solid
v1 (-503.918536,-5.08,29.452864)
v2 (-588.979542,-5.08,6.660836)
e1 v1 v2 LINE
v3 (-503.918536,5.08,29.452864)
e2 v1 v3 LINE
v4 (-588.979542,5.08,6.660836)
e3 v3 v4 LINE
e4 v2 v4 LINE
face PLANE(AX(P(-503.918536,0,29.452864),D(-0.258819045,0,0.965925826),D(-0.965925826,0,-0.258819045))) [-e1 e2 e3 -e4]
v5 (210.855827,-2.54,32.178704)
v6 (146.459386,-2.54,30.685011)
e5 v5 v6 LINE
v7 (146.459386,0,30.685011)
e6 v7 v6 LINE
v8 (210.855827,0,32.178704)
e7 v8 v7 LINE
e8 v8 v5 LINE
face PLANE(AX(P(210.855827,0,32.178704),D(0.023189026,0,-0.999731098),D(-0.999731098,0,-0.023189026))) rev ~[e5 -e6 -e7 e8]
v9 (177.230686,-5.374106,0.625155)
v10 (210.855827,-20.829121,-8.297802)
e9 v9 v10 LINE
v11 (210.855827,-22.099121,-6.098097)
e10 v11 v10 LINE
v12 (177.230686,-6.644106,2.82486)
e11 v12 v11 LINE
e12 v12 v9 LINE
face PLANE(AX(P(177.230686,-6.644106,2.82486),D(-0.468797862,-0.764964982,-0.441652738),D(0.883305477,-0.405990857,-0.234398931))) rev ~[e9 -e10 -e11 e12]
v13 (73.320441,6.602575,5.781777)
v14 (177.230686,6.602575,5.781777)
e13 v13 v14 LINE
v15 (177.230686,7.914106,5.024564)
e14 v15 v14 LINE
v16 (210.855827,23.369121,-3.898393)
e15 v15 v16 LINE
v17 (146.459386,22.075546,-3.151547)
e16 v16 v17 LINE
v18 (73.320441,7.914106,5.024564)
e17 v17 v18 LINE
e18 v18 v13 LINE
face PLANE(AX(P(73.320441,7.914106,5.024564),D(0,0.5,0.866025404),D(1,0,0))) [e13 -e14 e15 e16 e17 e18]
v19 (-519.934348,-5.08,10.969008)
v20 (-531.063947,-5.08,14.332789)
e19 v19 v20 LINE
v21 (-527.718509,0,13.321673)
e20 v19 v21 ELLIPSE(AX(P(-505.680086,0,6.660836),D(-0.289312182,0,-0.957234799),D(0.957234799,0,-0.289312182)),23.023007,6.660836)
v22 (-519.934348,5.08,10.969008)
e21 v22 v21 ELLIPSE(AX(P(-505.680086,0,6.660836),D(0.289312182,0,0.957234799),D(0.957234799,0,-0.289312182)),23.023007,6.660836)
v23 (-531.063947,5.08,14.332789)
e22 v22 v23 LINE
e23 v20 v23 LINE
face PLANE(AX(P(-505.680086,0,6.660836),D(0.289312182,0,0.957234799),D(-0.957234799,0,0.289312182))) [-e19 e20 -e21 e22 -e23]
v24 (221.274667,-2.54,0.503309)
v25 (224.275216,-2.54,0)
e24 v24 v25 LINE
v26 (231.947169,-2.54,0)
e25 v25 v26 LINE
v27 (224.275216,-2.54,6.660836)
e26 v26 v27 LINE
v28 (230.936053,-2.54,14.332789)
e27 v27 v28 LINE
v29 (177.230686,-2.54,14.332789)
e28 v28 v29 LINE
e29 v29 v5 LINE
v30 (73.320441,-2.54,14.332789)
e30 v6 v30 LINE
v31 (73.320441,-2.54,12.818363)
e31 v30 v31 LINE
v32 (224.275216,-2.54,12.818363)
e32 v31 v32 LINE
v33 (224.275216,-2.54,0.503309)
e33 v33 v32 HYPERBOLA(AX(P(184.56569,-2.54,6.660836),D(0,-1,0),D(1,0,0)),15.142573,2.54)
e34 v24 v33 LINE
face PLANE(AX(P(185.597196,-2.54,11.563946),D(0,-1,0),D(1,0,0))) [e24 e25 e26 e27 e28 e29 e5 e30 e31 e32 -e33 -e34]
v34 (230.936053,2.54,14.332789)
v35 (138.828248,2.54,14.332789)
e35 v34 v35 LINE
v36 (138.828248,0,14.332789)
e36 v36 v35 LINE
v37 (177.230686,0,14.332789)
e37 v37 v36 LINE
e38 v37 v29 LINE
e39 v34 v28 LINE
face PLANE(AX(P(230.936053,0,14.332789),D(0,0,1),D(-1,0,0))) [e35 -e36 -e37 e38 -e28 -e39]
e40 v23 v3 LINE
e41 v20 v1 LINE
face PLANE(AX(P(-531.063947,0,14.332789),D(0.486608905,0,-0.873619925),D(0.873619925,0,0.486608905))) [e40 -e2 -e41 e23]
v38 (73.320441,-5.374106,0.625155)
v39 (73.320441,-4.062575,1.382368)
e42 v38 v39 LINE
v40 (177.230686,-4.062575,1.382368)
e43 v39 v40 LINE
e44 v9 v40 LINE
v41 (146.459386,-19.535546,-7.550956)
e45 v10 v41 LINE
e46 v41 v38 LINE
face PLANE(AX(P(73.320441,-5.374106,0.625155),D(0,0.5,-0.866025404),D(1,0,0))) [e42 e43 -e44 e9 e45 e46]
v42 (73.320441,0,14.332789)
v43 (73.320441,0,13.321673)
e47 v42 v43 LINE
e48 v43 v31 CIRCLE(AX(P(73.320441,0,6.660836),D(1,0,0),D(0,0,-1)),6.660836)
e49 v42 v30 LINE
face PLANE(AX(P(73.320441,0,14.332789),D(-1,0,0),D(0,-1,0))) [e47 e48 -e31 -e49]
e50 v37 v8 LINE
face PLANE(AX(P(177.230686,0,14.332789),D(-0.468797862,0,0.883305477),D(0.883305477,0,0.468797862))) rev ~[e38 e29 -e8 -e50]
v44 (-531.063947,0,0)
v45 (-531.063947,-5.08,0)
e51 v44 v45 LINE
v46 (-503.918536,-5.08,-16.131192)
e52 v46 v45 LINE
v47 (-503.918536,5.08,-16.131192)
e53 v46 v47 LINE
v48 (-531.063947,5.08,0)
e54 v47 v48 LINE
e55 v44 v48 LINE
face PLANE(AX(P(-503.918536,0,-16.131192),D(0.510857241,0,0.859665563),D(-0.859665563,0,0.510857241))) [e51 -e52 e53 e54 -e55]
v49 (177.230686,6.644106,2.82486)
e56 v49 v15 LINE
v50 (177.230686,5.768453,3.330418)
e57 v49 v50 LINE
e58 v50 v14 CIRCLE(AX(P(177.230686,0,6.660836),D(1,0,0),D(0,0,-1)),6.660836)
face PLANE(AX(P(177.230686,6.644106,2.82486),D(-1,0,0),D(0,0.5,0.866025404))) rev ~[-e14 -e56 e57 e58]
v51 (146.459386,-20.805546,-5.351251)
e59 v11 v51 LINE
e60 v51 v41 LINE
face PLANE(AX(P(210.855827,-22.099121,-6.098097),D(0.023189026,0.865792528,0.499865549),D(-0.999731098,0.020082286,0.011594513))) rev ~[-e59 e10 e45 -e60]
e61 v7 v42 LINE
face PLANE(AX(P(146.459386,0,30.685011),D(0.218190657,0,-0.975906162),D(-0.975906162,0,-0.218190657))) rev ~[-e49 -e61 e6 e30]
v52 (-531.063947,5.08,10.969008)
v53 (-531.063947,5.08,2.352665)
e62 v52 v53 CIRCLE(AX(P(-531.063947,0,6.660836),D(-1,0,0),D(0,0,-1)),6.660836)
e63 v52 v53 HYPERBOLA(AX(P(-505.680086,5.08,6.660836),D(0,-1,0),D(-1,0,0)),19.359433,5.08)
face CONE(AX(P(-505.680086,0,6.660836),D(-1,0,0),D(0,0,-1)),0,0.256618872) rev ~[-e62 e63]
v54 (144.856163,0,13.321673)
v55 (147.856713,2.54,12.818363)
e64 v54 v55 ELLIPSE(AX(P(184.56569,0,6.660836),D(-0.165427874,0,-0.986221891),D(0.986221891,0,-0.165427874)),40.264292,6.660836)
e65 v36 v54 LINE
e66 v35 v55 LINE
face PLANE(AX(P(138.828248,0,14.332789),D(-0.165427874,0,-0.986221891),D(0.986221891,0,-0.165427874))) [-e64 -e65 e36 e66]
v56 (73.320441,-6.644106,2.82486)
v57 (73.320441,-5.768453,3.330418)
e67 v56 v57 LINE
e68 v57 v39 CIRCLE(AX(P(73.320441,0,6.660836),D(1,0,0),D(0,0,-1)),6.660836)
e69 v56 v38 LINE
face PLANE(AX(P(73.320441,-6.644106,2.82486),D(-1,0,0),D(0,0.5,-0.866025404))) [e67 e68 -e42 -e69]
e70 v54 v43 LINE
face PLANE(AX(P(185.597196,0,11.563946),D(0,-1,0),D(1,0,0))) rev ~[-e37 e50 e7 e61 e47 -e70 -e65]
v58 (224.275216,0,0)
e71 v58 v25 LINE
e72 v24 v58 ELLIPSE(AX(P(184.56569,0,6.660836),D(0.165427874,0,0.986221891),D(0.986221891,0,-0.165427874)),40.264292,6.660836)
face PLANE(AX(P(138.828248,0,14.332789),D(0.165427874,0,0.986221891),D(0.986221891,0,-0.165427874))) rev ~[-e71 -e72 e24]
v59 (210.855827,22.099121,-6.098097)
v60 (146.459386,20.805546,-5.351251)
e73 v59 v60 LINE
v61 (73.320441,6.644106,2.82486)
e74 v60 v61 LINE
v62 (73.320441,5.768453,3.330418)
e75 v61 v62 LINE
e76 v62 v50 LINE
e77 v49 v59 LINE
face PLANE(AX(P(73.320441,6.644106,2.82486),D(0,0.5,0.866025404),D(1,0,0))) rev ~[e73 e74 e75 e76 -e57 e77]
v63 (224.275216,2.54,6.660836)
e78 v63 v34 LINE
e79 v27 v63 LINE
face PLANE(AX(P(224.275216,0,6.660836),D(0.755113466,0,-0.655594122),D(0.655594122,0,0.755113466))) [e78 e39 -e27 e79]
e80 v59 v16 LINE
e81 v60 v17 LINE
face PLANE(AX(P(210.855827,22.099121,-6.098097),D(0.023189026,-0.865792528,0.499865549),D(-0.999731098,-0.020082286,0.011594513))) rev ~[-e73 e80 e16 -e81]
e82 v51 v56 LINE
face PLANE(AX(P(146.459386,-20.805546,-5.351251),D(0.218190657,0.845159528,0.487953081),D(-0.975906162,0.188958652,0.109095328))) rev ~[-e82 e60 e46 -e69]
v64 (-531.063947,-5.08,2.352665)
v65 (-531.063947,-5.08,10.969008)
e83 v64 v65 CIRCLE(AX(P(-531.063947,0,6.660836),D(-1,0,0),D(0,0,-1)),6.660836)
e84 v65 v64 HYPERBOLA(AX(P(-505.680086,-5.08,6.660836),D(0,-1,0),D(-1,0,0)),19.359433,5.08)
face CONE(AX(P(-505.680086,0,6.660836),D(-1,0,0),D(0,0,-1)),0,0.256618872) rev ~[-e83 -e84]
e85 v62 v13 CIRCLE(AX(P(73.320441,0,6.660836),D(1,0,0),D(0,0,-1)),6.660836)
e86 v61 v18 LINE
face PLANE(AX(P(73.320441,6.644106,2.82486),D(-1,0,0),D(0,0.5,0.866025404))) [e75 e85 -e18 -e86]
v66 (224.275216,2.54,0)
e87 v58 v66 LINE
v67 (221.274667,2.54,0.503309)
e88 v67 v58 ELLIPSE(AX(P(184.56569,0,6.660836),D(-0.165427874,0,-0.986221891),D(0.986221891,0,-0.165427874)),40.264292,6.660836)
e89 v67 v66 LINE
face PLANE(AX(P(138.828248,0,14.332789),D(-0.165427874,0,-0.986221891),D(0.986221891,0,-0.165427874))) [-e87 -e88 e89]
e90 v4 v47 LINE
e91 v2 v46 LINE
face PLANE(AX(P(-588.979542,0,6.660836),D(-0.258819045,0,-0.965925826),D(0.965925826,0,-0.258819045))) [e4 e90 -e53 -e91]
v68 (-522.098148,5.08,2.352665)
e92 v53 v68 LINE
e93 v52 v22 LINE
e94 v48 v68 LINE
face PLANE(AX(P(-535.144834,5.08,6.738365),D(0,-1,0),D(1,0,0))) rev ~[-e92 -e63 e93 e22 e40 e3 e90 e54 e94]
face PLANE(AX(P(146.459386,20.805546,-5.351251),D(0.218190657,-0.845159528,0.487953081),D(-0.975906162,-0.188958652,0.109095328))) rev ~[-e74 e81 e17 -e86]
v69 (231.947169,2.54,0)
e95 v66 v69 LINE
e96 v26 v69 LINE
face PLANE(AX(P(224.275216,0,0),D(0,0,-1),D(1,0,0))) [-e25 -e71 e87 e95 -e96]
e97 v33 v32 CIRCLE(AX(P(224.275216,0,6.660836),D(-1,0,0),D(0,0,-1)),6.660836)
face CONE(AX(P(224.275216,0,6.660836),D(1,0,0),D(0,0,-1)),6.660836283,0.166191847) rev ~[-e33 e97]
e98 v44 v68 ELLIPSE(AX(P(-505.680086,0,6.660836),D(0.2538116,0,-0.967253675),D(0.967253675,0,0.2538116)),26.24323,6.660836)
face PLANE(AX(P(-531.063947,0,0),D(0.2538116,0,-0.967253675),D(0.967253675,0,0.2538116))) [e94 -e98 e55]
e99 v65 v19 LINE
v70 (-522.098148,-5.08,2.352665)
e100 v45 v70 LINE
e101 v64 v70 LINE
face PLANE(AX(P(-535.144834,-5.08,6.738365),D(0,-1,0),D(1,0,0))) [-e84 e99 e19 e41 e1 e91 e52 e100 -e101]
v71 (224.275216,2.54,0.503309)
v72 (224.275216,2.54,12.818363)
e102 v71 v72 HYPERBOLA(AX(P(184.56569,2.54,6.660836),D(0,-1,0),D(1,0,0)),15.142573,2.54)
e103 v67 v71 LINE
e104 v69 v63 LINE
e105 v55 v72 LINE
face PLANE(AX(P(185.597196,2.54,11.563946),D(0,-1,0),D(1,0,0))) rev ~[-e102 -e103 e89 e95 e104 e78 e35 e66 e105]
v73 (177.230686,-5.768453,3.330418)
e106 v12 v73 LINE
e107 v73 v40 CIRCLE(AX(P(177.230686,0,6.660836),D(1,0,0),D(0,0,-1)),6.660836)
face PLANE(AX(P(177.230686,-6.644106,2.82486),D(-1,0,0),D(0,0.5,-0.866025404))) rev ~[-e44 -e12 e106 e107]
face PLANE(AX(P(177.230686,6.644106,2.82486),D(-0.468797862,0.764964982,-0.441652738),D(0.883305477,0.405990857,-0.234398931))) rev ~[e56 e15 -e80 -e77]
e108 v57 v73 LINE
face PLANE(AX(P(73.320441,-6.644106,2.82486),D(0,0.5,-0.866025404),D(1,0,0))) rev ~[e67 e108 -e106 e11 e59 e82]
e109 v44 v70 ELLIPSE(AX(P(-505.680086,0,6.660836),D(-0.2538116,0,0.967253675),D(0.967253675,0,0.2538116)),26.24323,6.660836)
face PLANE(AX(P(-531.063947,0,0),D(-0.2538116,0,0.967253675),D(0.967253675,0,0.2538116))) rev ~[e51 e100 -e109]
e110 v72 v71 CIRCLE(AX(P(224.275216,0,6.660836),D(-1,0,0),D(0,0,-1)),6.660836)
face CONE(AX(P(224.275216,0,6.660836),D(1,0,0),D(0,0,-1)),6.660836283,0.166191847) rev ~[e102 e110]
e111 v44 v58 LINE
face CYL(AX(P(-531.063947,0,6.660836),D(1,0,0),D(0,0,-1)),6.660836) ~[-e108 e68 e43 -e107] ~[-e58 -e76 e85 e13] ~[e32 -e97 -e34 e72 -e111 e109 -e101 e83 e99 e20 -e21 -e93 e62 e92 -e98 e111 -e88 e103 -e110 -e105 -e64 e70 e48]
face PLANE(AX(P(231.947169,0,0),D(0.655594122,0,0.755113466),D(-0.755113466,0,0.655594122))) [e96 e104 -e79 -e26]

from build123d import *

# Parameters (mm, degrees)
F2_DEPTH      = 5.08
F3_DEPTH      = 5.08
F4_DEPTH      = 2.54
F5_COUNT      = 3
F6_DEPTH      = 10.16
F7_DEPTH      = 10.16
F8_DEPTH      = 7.62
F9_DEPTH      = 2.54
F9_DEPTH_BACK = 2.54


with BuildPart() as f1:
    # F0 (on Front) → F1 (revolve)
    with BuildSketch(Plane.XZ):
        Polygon((-531.0639472567, 0), (224.2752164602, 0), (184.5656899125, 6.6608362831), (-505.6800862797, 6.6608362831), align=None)
    revolve(axis=Axis((-140.7024349097, 0, 6.6608362831), (-1, 0, 0)))

    # F0 (on Front) → F2 (join)
    with BuildSketch(Plane.XZ):
        Polygon((-503.9185357909, -16.1311917064), (-531.0639472567, 0), (-505.6800862797, 6.6608362831), (-531.0639472567, 14.332789099), (-503.9185357909, 29.4528642727), (-588.9795422554, 6.6608362831), align=None)
    extrude(amount=F2_DEPTH)

    # F0 (on Front) → F3 (join)
    with BuildSketch(Plane.XZ):
        Polygon((-503.9185357909, -16.1311917064), (-531.0639472567, 0), (-505.6800862797, 6.6608362831), (-531.0639472567, 14.332789099), (-503.9185357909, 29.4528642727), (-588.9795422554, 6.6608362831), align=None)
    extrude(amount=-F3_DEPTH)



with BuildPart() as f4:
    # F0 (on Front) → F4 (new body)
    with BuildSketch(Plane.XZ):
        Polygon((138.8282477856, 14.332789099), (177.2306859493, 14.332789099), (210.8558267355, 32.1787036955), (146.4593857527, 30.6850112975), (73.320440948, 14.332789099), align=None)
    extrude(amount=F4_DEPTH)


with BuildPart() as f5_1:
    # F5: instance of F4
    add(f4.part.rotate(Axis((-140.7024349097, 0, 6.6608362831), (-1, 0, 0)), 1 * 360 / F5_COUNT))


with BuildPart() as f5_2:
    # F5: instance of F4
    add(f4.part.rotate(Axis((-140.7024349097, 0, 6.6608362831), (-1, 0, 0)), 2 * 360 / F5_COUNT))


with BuildPart() as f1_1:
    add(f1.part)
    # F6 (add): a face of the model
    f6_faces = [f5_1.part.faces().sort_by_distance(p)[0] for p in [
        (125.2755634487, 7.2791060352, 3.924712138),
    ]]

    add(f5_1.part)  # F6 merges F5_1
    extrude(f6_faces, amount=F6_DEPTH)

    # F7 (add): a face of the model
    f7_faces = [f4.part.faces().sort_by_distance(p)[0] for p in [
        (125.2755634487, -1.27, 14.332789099),
    ]]

    add(f4.part)  # F7 merges F4
    extrude(f7_faces, amount=F7_DEPTH)

    # F8 (add): a face of the model
    f8_faces = [f5_2.part.faces().sort_by_distance(p)[0] for p in [
        (125.2755634487, -6.0091060352, 1.7250076124),
    ]]

    add(f5_2.part)  # F8 merges F5_2
    extrude(f8_faces, amount=F8_DEPTH)

    # F0 (on Front) → F9 (join, two sides)
    with BuildSketch(Plane.XZ) as f9_sk:
        Polygon((184.5656899125, 6.6608362831), (224.2752164602, 6.6608362831), (230.9360527433, 14.332789099), (177.2306859493, 14.332789099), (138.8282477856, 14.332789099), align=None)
        Polygon((224.2752164602, 0), (231.9471692761, 0), (224.2752164602, 6.6608362831), (184.5656899125, 6.6608362831), align=None)
    extrude(amount=F9_DEPTH)
    extrude(f9_sk.sketch, amount=-F9_DEPTH_BACK)


solid = f1_1.part
